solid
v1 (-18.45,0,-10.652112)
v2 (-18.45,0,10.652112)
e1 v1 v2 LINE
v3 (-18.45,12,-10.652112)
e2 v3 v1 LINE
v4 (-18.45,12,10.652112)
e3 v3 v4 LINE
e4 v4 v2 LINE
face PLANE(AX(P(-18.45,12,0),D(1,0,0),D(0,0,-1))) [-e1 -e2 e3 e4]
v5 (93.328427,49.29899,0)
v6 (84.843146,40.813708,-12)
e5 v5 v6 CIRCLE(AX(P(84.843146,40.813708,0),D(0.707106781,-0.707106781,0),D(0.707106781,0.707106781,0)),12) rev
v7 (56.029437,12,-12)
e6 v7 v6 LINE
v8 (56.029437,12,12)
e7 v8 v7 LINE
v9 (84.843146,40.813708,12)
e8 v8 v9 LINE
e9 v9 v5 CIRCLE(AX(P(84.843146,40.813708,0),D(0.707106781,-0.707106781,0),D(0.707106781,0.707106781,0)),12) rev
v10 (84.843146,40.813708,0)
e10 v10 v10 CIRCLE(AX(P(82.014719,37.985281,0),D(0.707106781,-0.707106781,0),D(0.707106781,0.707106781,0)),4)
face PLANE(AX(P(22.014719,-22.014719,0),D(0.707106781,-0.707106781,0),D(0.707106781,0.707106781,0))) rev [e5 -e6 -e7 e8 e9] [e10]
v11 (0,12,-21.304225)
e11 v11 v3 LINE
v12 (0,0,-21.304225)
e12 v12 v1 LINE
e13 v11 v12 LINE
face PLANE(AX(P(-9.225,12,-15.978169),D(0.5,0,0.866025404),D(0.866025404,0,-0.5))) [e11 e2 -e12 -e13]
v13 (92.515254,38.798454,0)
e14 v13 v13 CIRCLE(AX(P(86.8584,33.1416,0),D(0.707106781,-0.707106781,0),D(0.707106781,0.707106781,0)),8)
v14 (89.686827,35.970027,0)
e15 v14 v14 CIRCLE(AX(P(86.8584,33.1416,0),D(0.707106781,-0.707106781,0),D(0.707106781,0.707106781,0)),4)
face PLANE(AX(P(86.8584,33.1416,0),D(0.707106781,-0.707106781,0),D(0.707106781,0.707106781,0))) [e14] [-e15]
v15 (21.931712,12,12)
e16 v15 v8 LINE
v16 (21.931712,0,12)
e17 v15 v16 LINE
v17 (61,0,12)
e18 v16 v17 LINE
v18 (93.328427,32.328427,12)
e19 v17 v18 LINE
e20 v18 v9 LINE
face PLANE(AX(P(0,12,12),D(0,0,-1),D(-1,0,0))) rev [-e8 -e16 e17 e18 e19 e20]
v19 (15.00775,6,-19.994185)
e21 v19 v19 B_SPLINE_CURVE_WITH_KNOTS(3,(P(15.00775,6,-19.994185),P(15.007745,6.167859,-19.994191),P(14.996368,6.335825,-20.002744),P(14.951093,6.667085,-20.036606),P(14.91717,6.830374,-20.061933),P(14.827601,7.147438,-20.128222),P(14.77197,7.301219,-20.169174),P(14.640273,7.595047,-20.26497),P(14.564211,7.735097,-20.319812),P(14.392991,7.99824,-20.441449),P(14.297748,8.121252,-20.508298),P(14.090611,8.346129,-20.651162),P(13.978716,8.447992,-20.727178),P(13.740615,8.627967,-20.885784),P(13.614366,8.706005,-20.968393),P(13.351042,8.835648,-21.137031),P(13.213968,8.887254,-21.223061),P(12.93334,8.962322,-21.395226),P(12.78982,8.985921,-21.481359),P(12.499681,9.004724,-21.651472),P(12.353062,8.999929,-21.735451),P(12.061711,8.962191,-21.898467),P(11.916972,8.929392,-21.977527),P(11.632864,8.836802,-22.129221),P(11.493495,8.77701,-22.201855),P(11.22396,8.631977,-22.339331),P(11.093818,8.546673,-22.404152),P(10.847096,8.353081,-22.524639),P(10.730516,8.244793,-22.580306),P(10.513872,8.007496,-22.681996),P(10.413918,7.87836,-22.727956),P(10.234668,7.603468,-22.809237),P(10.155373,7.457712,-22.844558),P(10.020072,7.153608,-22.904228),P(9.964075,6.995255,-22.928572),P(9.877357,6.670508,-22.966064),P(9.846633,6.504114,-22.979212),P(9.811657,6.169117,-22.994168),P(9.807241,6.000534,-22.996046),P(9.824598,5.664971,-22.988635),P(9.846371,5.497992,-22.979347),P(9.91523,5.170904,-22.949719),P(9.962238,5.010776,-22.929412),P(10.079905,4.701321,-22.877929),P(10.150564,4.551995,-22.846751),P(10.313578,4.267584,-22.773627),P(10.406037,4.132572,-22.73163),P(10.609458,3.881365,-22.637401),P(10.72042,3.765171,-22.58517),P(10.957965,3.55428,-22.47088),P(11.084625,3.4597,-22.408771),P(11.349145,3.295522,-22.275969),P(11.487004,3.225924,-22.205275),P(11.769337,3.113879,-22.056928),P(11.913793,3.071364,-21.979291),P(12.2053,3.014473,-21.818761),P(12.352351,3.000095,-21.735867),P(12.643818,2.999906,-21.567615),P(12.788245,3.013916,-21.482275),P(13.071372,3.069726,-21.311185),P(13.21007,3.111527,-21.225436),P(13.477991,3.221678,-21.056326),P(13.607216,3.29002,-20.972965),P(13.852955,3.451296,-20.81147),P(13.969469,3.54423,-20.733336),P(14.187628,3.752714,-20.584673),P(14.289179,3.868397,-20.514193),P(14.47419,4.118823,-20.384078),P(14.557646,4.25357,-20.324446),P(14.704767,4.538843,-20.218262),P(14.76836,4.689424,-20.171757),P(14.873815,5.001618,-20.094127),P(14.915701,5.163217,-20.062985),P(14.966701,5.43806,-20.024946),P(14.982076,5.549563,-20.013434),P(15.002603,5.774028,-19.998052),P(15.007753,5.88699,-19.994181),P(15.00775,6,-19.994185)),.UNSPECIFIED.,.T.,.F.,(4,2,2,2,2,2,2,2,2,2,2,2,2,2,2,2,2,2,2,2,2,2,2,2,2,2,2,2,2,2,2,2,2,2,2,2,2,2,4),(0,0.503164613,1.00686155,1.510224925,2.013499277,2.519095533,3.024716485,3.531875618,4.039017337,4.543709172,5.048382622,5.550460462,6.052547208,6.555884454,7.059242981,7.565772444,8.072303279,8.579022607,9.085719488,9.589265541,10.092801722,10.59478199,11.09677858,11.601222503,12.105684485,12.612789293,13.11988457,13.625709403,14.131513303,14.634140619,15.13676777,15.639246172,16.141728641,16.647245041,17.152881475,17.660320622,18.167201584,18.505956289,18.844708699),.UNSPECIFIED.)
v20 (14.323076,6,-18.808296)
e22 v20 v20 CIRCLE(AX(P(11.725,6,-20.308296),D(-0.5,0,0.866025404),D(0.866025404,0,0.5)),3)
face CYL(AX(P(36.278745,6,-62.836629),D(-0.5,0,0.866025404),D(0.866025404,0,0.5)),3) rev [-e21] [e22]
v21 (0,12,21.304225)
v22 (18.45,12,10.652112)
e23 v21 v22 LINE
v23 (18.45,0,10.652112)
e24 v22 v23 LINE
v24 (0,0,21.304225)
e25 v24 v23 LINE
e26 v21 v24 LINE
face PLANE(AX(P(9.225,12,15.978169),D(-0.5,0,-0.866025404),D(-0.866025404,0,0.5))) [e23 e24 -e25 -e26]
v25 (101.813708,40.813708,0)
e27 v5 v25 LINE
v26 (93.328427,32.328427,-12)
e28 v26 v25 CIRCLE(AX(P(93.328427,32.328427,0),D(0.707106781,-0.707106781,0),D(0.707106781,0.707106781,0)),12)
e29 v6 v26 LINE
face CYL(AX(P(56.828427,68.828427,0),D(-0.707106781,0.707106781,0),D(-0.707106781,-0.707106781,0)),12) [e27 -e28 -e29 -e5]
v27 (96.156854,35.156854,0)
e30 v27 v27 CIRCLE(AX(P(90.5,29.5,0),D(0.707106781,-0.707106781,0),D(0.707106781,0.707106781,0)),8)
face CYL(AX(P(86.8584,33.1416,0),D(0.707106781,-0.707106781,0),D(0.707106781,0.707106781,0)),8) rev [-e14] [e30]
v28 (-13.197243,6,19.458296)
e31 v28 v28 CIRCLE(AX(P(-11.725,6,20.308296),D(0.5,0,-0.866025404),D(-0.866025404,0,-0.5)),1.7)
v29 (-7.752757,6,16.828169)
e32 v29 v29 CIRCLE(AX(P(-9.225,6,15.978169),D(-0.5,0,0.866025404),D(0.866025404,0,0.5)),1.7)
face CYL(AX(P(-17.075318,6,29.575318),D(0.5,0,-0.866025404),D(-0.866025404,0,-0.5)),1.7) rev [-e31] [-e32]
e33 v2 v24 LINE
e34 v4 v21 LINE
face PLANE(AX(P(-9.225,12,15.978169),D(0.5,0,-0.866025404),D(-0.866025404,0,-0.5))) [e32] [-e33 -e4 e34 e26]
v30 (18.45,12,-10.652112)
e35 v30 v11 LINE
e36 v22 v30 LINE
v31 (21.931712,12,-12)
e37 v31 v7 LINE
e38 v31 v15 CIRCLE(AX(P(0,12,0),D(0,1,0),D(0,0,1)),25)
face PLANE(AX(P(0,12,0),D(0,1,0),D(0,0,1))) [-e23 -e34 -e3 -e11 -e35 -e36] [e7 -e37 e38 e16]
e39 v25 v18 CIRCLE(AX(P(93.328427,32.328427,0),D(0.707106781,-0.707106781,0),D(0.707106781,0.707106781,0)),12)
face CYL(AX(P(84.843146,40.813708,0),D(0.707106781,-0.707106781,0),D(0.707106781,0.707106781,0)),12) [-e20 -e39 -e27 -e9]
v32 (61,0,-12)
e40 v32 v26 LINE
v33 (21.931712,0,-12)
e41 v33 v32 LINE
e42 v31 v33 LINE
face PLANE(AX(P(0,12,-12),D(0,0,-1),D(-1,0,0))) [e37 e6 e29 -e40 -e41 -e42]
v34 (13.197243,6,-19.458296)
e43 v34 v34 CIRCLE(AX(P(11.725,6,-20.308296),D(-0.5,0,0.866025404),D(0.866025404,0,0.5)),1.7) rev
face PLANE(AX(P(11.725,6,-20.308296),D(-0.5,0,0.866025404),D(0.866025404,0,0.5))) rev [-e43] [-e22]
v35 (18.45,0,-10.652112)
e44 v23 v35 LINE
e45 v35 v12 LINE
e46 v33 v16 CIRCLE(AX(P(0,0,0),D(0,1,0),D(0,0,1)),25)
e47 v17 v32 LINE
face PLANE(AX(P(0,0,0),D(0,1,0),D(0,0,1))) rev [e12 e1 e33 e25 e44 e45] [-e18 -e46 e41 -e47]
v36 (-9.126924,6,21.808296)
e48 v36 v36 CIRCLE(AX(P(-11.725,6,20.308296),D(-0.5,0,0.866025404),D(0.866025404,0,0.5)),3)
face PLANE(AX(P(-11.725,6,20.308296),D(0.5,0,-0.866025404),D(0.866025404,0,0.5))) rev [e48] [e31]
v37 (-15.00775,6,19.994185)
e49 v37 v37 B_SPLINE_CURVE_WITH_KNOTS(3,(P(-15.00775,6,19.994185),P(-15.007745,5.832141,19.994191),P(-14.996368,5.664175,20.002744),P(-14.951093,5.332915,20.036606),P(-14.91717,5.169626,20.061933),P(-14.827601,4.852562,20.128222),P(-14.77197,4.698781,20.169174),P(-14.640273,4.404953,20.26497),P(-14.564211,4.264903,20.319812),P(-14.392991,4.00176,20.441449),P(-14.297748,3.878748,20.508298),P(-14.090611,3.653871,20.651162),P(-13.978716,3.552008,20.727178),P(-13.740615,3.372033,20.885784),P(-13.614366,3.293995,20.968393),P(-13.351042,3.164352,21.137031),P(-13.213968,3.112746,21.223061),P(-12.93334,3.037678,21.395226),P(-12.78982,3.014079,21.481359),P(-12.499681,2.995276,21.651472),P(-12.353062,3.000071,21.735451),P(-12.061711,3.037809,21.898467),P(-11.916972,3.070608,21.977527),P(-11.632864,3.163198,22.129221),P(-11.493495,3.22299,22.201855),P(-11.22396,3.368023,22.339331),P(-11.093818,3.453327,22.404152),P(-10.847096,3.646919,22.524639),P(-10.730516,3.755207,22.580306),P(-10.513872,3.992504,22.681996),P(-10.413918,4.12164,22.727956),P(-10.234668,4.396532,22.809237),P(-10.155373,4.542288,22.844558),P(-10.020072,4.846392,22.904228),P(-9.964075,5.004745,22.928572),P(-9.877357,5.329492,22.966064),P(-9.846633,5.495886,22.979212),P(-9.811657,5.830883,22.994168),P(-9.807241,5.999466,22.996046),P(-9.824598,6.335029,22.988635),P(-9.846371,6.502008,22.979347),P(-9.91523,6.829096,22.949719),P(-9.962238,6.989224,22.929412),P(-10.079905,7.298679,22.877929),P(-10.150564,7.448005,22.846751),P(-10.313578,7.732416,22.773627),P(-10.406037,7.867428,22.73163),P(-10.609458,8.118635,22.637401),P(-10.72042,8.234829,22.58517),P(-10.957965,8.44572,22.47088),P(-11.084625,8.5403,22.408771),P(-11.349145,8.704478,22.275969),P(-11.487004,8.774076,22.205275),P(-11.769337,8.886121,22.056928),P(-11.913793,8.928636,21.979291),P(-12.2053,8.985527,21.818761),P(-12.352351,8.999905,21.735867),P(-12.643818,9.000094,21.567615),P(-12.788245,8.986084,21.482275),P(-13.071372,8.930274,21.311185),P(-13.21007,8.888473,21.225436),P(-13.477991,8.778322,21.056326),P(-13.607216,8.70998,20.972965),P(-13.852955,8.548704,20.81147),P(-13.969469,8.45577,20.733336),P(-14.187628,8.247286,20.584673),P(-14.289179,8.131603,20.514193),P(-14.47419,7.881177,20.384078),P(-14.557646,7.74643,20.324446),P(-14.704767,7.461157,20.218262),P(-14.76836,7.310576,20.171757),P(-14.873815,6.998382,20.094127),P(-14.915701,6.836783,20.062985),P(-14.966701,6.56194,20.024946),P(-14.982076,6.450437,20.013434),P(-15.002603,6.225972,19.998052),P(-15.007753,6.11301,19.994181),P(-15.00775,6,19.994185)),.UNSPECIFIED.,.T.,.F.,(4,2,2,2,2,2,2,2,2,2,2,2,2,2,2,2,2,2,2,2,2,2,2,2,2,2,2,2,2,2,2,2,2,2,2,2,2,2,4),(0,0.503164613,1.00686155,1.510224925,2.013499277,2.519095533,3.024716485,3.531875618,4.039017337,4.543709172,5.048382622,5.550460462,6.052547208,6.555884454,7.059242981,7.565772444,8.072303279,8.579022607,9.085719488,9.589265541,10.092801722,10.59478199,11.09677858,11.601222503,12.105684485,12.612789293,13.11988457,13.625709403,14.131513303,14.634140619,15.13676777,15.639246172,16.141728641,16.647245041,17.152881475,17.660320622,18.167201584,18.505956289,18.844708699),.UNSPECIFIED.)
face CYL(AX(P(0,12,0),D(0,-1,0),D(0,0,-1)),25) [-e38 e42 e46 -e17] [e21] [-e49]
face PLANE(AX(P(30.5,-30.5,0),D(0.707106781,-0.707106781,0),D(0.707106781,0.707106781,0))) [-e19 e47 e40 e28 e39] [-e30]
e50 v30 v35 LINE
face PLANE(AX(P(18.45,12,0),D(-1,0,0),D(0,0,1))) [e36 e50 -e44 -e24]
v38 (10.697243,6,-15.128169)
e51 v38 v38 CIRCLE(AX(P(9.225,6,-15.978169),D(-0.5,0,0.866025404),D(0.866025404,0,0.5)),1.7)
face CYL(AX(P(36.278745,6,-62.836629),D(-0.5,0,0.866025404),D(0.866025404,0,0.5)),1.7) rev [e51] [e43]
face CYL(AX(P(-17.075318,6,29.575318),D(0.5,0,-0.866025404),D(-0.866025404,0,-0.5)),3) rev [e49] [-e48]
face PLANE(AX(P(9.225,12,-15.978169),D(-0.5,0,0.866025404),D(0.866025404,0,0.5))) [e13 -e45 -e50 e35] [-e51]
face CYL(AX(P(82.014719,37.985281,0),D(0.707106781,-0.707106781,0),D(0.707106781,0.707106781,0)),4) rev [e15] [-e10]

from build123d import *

# Parameters (mm, degrees)
BOSS_EXTRUDE1_DEPTH = 12
SKETCH4_W           = 57.71930009
SKETCH4_H           = 24
SKETCH4_R           = 4
BOSS_EXTRUDE2_DEPTH = 12
SKETCH4_3_R         = 8
SKETCH4_3_R_2       = 4
CUT_EXTRUDE1_DEPTH  = 5.15
FILLET1_R           = 12
SKETCH5_R           = 1.7
CUT_EXTRUDE2_DEPTH  = 113.615583531
CUT_EXTRUDE3_START  = -5
SKETCH5_3_R         = 3
CUT_EXTRUDE3_DEPTH  = 108.615583567


with BuildPart() as part:
    # Sketch3 → Boss-Extrude1 (new body)
    with BuildSketch(Plane(origin=(0, 0, 0), x_dir=(1, 0, 0), z_dir=(0, 1, 0))):
        with BuildLine():
            ThreePointArc((21.931712199, 12), (-25, 0), (21.931712199, -12))
            Line((21.931712199, -12), (61, -12))
            Line((61, -12), (61, 12))
            Line((61, 12), (21.931712199, 12))
        make_face()
        Polygon((-18.45, 10.652112467), (0, 21.304224933), (18.45, 10.652112467), (18.45, -10.652112467), (0, -21.304224933), (-18.45, -10.652112467), align=None, mode=Mode.SUBTRACT)
    extrude(amount=BOSS_EXTRUDE1_DEPTH)

    # Sketch4 → Boss-Extrude2 (add)
    with BuildSketch(Plane(origin=(30.5, -30.5, 0), x_dir=(0.7071067811865462, 0.7071067811865489, 0), z_dir=(0.7071067811865489, -0.7071067811865462, 0))):
        with Locations((71.993163697, 0)):
            Rectangle(SKETCH4_W, SKETCH4_H)
        with Locations((84.852813742, 0)):
            Circle(SKETCH4_R, mode=Mode.SUBTRACT)
    extrude(amount=-BOSS_EXTRUDE2_DEPTH)

    # Sketch4<3> → Cut-Extrude1 (cut)
    with BuildSketch(Plane(origin=(30.5, -30.5, 0), x_dir=(0.7071067811865462, 0.7071067811865489, 0), z_dir=(0.7071067811865489, -0.7071067811865462, 0))):
        with Locations((84.852813742, 0)):
            Circle(SKETCH4_3_R)
        with Locations((84.852813742, 0)):
            Circle(SKETCH4_3_R_2, mode=Mode.SUBTRACT)
    extrude(amount=-CUT_EXTRUDE1_DEPTH, mode=Mode.SUBTRACT)

    # Fillet1
    fillet1_edges = [part.edges().sort_by_distance(p)[0] for p in [
        (97.571067812, 45.056349186, -12),
        (97.571067812, 45.056349186, 12),
    ]]
    fillet(fillet1_edges, radius=FILLET1_R - 0.0001)  # a hair under: the kernel refuses the full size

    # Sketch5 → Cut-Extrude2 (cut, through all)
    with BuildSketch(Plane(origin=(9.225, 0, -15.9781687), x_dir=(0.8660254037844388, 0, 0.4999999999999997), z_dir=(-0.49999999999999983, 0, 0.8660254037844389))):
        with Locations((0, 6)):
            Circle(SKETCH5_R)
    cut_extrude2 = extrude(amount=-CUT_EXTRUDE2_DEPTH, mode=Mode.SUBTRACT)

    # Sketch5<3> → Cut-Extrude3 (cut, through all)
    with BuildSketch(Plane(origin=(9.225, 0, -15.9781687), x_dir=(0.8660254037844388, 0, 0.4999999999999997), z_dir=(-0.49999999999999983, 0, 0.8660254037844389)).offset(CUT_EXTRUDE3_START)):
        with Locations((0, 6)):
            Circle(SKETCH5_3_R)
    cut_extrude3 = extrude(amount=-CUT_EXTRUDE3_DEPTH, mode=Mode.SUBTRACT)

    # Mirror1: Cut-Extrude2, Cut-Extrude3 across plane
    add(cut_extrude2.mirror(Plane(origin=(0, 0, 0), x_dir=(0.866025403784439, 0, 0.4999999999999995), z_dir=(-0.49999999999999994, 0, 0.8660254037844388))), mode=Mode.SUBTRACT)
    add(cut_extrude3.mirror(Plane(origin=(0, 0, 0), x_dir=(0.866025403784439, 0, 0.4999999999999995), z_dir=(-0.49999999999999994, 0, 0.8660254037844388))), mode=Mode.SUBTRACT)


solid = part.part
